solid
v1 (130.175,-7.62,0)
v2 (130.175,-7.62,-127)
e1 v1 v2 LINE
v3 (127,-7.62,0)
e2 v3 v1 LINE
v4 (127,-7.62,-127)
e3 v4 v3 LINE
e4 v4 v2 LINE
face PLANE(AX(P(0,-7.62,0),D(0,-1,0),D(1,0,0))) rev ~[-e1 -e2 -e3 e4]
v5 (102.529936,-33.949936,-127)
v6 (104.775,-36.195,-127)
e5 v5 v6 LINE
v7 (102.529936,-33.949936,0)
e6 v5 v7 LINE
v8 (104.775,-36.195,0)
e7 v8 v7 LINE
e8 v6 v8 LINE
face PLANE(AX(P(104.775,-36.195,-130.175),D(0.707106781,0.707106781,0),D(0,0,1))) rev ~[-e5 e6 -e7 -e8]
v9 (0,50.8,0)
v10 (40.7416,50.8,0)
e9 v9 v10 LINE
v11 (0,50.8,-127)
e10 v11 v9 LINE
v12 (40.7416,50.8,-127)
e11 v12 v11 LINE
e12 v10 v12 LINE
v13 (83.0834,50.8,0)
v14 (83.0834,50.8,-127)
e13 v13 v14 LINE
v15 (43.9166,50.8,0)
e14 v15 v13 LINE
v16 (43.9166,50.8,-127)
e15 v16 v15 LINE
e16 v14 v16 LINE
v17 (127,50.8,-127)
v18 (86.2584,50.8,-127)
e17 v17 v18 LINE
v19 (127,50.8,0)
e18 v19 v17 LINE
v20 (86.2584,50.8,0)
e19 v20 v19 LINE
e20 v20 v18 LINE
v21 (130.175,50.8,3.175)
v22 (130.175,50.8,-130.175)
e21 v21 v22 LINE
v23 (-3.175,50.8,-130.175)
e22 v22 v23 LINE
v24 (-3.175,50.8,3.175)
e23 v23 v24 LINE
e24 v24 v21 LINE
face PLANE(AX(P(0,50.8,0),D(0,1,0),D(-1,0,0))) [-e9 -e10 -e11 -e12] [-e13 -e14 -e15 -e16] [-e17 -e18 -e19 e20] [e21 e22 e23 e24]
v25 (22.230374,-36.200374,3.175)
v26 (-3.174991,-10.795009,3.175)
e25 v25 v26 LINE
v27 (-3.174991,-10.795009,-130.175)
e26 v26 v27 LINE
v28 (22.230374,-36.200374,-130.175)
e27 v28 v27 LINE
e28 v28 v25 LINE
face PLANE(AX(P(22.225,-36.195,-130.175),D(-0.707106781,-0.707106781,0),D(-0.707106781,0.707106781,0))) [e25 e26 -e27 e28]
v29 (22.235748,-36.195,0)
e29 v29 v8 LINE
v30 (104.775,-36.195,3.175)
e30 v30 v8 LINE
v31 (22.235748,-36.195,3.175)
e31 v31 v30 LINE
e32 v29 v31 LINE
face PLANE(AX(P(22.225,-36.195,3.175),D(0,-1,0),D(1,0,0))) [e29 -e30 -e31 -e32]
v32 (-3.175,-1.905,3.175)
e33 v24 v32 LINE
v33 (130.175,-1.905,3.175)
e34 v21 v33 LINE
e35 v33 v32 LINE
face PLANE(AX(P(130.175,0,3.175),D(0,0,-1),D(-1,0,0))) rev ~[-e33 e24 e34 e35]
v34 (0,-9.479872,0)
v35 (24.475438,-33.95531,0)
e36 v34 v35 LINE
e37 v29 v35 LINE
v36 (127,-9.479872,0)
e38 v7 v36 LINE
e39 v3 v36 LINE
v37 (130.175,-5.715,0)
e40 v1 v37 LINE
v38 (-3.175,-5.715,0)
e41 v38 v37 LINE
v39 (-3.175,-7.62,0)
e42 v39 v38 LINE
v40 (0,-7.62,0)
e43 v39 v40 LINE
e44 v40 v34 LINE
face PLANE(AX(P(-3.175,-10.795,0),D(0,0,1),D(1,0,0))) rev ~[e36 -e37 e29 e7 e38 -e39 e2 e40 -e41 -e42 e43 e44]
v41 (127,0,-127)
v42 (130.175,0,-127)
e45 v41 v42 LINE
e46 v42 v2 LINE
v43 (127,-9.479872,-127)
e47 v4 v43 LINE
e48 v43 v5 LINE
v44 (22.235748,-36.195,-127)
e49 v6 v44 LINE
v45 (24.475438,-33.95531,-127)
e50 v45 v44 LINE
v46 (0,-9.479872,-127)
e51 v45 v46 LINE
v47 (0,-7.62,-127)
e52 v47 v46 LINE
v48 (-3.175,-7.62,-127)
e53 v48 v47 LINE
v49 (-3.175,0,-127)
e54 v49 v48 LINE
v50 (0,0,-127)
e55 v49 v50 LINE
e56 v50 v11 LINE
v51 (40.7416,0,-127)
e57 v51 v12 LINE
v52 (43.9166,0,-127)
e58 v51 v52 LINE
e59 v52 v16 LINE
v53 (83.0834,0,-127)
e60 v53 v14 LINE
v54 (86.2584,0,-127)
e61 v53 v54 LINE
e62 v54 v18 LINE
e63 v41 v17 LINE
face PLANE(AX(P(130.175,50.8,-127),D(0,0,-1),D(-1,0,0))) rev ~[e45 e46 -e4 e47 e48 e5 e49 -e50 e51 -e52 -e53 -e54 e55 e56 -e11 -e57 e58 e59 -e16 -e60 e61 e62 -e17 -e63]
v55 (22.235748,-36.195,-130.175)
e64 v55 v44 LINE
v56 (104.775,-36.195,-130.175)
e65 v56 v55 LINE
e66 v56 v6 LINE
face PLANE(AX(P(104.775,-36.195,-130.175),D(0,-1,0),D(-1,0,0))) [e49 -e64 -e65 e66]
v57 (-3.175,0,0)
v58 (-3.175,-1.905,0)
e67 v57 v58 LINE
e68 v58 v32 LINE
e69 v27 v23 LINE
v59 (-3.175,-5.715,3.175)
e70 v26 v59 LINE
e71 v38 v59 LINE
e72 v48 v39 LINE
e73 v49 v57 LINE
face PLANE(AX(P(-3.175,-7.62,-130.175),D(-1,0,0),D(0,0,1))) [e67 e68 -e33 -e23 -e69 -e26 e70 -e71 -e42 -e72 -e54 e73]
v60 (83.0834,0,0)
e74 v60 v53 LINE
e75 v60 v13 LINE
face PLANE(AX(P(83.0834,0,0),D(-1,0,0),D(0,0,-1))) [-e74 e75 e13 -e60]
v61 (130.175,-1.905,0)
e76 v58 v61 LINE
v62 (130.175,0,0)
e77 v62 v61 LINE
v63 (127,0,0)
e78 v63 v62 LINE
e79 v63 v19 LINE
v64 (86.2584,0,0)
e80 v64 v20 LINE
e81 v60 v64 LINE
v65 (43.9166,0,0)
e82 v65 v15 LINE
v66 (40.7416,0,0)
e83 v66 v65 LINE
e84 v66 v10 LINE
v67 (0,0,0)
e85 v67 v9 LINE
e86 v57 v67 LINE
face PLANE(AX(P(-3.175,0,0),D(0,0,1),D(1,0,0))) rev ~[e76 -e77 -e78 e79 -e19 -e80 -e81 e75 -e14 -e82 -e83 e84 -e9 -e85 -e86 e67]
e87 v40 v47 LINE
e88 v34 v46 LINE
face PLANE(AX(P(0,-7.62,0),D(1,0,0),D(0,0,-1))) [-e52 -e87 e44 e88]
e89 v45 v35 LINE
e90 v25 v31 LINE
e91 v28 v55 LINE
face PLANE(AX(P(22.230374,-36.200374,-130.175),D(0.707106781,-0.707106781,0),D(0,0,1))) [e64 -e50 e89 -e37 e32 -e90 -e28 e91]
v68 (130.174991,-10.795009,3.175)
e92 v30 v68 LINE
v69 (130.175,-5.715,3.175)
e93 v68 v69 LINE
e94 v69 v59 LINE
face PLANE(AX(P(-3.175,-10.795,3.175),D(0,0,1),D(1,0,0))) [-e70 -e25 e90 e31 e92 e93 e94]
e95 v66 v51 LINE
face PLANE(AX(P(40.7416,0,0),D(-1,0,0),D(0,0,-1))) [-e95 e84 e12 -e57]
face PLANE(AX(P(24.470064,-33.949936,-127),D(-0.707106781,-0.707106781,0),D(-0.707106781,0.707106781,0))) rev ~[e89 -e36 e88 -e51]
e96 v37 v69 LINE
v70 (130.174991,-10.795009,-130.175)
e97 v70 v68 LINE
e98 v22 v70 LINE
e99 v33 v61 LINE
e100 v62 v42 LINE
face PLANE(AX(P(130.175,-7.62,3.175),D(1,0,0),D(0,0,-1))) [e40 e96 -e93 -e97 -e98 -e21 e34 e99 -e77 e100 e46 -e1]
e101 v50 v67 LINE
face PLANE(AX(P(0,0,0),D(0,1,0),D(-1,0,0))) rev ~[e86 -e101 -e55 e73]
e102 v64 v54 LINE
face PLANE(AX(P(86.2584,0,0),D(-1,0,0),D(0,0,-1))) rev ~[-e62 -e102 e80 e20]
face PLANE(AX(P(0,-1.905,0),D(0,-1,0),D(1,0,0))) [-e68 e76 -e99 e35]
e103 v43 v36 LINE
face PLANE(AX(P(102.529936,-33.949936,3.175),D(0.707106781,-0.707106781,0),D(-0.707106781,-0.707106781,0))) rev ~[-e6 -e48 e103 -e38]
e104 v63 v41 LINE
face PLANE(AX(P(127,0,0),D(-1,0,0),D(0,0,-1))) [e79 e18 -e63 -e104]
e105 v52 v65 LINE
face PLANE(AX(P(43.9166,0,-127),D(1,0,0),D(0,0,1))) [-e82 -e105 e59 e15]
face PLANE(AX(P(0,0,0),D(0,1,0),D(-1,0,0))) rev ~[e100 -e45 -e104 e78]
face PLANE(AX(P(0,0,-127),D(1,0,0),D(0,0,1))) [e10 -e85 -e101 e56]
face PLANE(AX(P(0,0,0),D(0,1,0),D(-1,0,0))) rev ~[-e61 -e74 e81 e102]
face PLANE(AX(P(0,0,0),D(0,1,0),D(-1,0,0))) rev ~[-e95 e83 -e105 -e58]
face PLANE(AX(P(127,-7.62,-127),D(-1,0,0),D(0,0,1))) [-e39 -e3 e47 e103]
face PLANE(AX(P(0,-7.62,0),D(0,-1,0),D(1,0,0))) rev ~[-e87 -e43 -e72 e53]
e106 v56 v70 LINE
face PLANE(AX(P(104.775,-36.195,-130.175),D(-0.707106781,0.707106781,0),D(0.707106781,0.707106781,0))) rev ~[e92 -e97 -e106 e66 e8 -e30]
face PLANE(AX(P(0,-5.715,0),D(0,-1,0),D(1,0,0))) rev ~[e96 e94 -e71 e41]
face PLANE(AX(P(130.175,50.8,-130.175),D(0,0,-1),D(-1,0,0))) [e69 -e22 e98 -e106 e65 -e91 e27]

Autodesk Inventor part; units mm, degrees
ref_plane "YZ Plane" through (0, 0, 0) normal (1, 0, 0) x (0, 1, 0)
ref_plane "XZ Plane" through (0, 0, 0) normal (0, 1, 0) x (-1, 0, 0)
ref_plane "XY Plane" through (0, 0, 0) normal (0, 0, 1) x (1, 0, 0)
sketch "Sketch2" plane through (0, 0, 0) normal (0, 1, 0) x (-1, 0, 0)
  line L0 (0, 0) -> (-127, 0)
  line L1 (-127, 0) -> (-127, -127)
  line L2 (-127, -127) -> (0, -127)
  line L3 (0, -127) -> (0, 0)
  line L4 (0, 0) -> (-40.7416, 0)
  line L5 (-40.7416, 0) -> (-40.7416, -127)
  line L6 (-40.7416, -127) -> (0, -127)
  line L7 (0, -127) -> (0, 0)
  line L8 (3.175, 3.175) -> (-130.175, 3.175)
  line L9 (-130.175, 3.175) -> (-130.175, -130.175)
  line L10 (-130.175, -130.175) -> (3.175, -130.175)
  line L11 (3.175, -130.175) -> (3.175, 3.175)
  line L12 (-127, 0) -> (-86.2584, 0)
  line L13 (-86.2584, 0) -> (-86.2584, -127)
  line L14 (-86.2584, -127) -> (-127, -127)
  line L15 (-127, -127) -> (-127, 0)
  line L16 (-40.7416, -44.9087) -> (-43.9166, -44.9087) construction
  line L17 (-86.2584, -51.4533) -> (-83.0834, -51.4533) construction
  line L18 (-43.9166, 0) -> (-83.0834, 0)
  line L19 (-83.0834, 0) -> (-83.0834, -127)
  line L20 (-83.0834, -127) -> (-43.9166, -127)
  line L21 (-43.9166, -127) -> (-43.9166, 0)
  dimension "d11" = 127
  dimension "d12" = 127
  dimension "d13" = 40.7416
  dimension "d14" = 3.175
  dimension "d15" = 40.7416
  dimension "d16" = 3.175
  dimension "d17" = 3.175
extrude "Extrusion2" add sketch "Sketch2" along normal blind 50.8 contours L5 L2 L21 L0 | L19 L2 L13 L0 | L11 L10 L9 L8
sketch "Sketch3" plane through (0, 0, 0) normal (0, -1, 0) x (1, 0, 0)
  line L0 (130.175, 3.175) -> (130.175, -130.175) projected
  line L1 (-3.175, -130.175) -> (-3.175, 3.175) projected
  line L2 (130.175, 3.175) -> (-3.175, 3.175)
  line L3 (-3.175, 3.175) -> (-3.175, 0)
  line L4 (-3.175, 0) -> (130.175, 0)
  line L5 (130.175, 0) -> (130.175, 3.175)
  line L6 (130.175, -130.175) -> (-3.175, -130.175)
  line L7 (-3.175, -130.175) -> (-3.175, -127)
  line L8 (-3.175, -127) -> (130.175, -127)
  line L9 (130.175, -127) -> (130.175, -130.175)
  point P0 (0, 0)
  dimension "d20" = 133.35
  dimension "d21" = 3.175
extrude "Extrusion3" add sketch "Sketch3" along normal blind 1.905 contours L0 L4 L1 L2
sketch "Sketch4" plane through (0, 0, 0) normal (0, -1, 0) x (1, 0, 0)
  line L0 (130.175, 0) -> (130.175, -130.175) projected
  line L1 (130.175, -130.175) -> (-3.175, -130.175)
  line L2 (-3.175, -130.175) -> (-3.175, -127)
  line L3 (-3.175, -127) -> (130.175, -127)
  line L4 (130.175, -127) -> (130.175, -130.175)
  point P0 (0, 0)
  dimension "d24" = 133.35
  dimension "d25" = 3.175
extrude "Extrusion4" add sketch "Sketch4" along normal blind 7.62
sketch "Sketch5" plane through (0, -7.62, 0) normal (0, -1, 0) x (1, 0, 0)
  line L0 (130.175, -130.175) -> (-3.175, -130.175) projected
  line L1 (130.175, -130.175) -> (-3.175, -130.175)
  line L2 (-3.175, -130.175) -> (-3.175, 3.175)
  line L3 (-3.175, 3.175) -> (130.175, 3.175)
  line L4 (130.175, 3.175) -> (130.175, -130.175)
  line L5 (127, 0) -> (0, 0)
  line L6 (0, 0) -> (0, -127)
  line L7 (0, -127) -> (127, -127)
  line L8 (127, -127) -> (127, 0)
  point P0 (0, 0)
  dimension "d32" = 3.175
extrude "Extrusion5" add sketch "Sketch5" along normal blind 3.175
sketch "Sketch6" plane through (0, -10.795, 0) normal (0, -1, 0) x (1, 0, 0)
  line L0 (130.175, -127) -> (130.175, 3.175) projected
  line L1 (-3.175, -130.175) -> (-3.175, 3.175) projected
  line L2 (130.175, 3.175) -> (-3.175, 3.175)
  line L3 (-3.175, 3.175) -> (-3.175, 0)
  line L4 (-3.175, 0) -> (130.175, 0)
  line L5 (130.175, 0) -> (130.175, 3.175)
  point P0 (0, 0)
extrude "Extrusion6" add sketch "Sketch6" against normal blind 5.08
sketch "Sketch7" plane through (-3.175, -10.795, 3.175) normal (0, 0, 1) x (1, 0, 0)
  line L0 (0, 0) -> (133.35, 0) construction
  line L1 (0, 0) -> (0, -25.4) construction
  line L2 (0, -25.4) -> (25.4, -25.4) construction
  line L3 (133.35, 0) -> (133.35, -25.4) construction
  line L4 (133.35, -25.4) -> (107.95, -25.4) construction
  line L5 (0, 0) -> (25.4, -25.4)
  line L6 (25.4, -25.4) -> (107.95, -25.4)
  line L7 (107.95, -25.4) -> (133.35, 0)
  line L8 (0, 0) -> (133.35, 0)
  point P0 (3.175, 10.795)
  dimension "d33" = 25.4
  dimension "d34" = 25.4
  dimension "d35" = 25.4
  dimension "d36" = 25.4
extrude "Extrusion7" add sketch "Sketch7" against normal blind 3.175
sketch "Sketch8" plane through (130.175, 50.8, -130.175) normal (0, 0, -1) x (-1, 0, 0)
  line L0 (107.95, -86.995) -> (133.35, -61.595) projected
  line L1 (133.35, -61.595) -> (107.95, -86.995)
  line L2 (25.4, -86.995) -> (107.95, -86.995) projected
  line L3 (107.95, -86.995) -> (25.4, -86.995)
  line L4 (0, -56.515) -> (0, -61.595) projected
  line L5 (25.4, -86.995) -> (0, -61.595)
  line L6 (0, -61.595) -> (133.35, -61.595)
  point P0 (130.175, -50.8)
extrude "Extrusion8" add sketch "Sketch8" against normal blind 3.175
sketch "Sketch9" plane through (22.225, -36.195, -127) normal (-0.7071068, -0.7071068, 0) x (-0.7071068, 0.7071068, 0)
  line L0 (35.921, 0) -> (35.921, 3.175) projected
  line L1 (39.5131, -130.175) -> (-54.7796, -130.175) projected
  line L2 (35.921, 3.175) -> (-0.0076, 3.175)
  line L3 (-0.0076, 3.175) -> (-0.0076, -130.175)
  line L4 (-0.0076, -130.175) -> (35.921, -130.175)
  line L5 (35.921, -130.175) -> (35.921, 3.175)
  point P0 (41.3092, -127)
  point P1 (35.921, -130.175)
  point P2 (35.921, 0)
extrude "Extrusion9" add sketch "Sketch9" against normal blind 3.175
sketch "Sketch10" plane through (104.775, -36.195, 3.175) normal (0.7071068, -0.7071068, 0) x (-0.7071068, -0.7071068, 0)
  line L0 (0, 0) -> (0, 3.175) projected
  line L1 (-35.921, 133.35) -> (0, 133.35) projected
  line L2 (0, 0) -> (-35.921, 0)
  line L3 (-35.921, 0) -> (-35.921, 133.35)
  line L4 (-35.921, 133.35) -> (0, 133.35)
  line L5 (0, 133.35) -> (0, 0)
  point P0 (48.4934, 3.175)
extrude "Extrusion10" add sketch "Sketch10" against normal blind 3.175
properties part number "BeadCompartments_4"
